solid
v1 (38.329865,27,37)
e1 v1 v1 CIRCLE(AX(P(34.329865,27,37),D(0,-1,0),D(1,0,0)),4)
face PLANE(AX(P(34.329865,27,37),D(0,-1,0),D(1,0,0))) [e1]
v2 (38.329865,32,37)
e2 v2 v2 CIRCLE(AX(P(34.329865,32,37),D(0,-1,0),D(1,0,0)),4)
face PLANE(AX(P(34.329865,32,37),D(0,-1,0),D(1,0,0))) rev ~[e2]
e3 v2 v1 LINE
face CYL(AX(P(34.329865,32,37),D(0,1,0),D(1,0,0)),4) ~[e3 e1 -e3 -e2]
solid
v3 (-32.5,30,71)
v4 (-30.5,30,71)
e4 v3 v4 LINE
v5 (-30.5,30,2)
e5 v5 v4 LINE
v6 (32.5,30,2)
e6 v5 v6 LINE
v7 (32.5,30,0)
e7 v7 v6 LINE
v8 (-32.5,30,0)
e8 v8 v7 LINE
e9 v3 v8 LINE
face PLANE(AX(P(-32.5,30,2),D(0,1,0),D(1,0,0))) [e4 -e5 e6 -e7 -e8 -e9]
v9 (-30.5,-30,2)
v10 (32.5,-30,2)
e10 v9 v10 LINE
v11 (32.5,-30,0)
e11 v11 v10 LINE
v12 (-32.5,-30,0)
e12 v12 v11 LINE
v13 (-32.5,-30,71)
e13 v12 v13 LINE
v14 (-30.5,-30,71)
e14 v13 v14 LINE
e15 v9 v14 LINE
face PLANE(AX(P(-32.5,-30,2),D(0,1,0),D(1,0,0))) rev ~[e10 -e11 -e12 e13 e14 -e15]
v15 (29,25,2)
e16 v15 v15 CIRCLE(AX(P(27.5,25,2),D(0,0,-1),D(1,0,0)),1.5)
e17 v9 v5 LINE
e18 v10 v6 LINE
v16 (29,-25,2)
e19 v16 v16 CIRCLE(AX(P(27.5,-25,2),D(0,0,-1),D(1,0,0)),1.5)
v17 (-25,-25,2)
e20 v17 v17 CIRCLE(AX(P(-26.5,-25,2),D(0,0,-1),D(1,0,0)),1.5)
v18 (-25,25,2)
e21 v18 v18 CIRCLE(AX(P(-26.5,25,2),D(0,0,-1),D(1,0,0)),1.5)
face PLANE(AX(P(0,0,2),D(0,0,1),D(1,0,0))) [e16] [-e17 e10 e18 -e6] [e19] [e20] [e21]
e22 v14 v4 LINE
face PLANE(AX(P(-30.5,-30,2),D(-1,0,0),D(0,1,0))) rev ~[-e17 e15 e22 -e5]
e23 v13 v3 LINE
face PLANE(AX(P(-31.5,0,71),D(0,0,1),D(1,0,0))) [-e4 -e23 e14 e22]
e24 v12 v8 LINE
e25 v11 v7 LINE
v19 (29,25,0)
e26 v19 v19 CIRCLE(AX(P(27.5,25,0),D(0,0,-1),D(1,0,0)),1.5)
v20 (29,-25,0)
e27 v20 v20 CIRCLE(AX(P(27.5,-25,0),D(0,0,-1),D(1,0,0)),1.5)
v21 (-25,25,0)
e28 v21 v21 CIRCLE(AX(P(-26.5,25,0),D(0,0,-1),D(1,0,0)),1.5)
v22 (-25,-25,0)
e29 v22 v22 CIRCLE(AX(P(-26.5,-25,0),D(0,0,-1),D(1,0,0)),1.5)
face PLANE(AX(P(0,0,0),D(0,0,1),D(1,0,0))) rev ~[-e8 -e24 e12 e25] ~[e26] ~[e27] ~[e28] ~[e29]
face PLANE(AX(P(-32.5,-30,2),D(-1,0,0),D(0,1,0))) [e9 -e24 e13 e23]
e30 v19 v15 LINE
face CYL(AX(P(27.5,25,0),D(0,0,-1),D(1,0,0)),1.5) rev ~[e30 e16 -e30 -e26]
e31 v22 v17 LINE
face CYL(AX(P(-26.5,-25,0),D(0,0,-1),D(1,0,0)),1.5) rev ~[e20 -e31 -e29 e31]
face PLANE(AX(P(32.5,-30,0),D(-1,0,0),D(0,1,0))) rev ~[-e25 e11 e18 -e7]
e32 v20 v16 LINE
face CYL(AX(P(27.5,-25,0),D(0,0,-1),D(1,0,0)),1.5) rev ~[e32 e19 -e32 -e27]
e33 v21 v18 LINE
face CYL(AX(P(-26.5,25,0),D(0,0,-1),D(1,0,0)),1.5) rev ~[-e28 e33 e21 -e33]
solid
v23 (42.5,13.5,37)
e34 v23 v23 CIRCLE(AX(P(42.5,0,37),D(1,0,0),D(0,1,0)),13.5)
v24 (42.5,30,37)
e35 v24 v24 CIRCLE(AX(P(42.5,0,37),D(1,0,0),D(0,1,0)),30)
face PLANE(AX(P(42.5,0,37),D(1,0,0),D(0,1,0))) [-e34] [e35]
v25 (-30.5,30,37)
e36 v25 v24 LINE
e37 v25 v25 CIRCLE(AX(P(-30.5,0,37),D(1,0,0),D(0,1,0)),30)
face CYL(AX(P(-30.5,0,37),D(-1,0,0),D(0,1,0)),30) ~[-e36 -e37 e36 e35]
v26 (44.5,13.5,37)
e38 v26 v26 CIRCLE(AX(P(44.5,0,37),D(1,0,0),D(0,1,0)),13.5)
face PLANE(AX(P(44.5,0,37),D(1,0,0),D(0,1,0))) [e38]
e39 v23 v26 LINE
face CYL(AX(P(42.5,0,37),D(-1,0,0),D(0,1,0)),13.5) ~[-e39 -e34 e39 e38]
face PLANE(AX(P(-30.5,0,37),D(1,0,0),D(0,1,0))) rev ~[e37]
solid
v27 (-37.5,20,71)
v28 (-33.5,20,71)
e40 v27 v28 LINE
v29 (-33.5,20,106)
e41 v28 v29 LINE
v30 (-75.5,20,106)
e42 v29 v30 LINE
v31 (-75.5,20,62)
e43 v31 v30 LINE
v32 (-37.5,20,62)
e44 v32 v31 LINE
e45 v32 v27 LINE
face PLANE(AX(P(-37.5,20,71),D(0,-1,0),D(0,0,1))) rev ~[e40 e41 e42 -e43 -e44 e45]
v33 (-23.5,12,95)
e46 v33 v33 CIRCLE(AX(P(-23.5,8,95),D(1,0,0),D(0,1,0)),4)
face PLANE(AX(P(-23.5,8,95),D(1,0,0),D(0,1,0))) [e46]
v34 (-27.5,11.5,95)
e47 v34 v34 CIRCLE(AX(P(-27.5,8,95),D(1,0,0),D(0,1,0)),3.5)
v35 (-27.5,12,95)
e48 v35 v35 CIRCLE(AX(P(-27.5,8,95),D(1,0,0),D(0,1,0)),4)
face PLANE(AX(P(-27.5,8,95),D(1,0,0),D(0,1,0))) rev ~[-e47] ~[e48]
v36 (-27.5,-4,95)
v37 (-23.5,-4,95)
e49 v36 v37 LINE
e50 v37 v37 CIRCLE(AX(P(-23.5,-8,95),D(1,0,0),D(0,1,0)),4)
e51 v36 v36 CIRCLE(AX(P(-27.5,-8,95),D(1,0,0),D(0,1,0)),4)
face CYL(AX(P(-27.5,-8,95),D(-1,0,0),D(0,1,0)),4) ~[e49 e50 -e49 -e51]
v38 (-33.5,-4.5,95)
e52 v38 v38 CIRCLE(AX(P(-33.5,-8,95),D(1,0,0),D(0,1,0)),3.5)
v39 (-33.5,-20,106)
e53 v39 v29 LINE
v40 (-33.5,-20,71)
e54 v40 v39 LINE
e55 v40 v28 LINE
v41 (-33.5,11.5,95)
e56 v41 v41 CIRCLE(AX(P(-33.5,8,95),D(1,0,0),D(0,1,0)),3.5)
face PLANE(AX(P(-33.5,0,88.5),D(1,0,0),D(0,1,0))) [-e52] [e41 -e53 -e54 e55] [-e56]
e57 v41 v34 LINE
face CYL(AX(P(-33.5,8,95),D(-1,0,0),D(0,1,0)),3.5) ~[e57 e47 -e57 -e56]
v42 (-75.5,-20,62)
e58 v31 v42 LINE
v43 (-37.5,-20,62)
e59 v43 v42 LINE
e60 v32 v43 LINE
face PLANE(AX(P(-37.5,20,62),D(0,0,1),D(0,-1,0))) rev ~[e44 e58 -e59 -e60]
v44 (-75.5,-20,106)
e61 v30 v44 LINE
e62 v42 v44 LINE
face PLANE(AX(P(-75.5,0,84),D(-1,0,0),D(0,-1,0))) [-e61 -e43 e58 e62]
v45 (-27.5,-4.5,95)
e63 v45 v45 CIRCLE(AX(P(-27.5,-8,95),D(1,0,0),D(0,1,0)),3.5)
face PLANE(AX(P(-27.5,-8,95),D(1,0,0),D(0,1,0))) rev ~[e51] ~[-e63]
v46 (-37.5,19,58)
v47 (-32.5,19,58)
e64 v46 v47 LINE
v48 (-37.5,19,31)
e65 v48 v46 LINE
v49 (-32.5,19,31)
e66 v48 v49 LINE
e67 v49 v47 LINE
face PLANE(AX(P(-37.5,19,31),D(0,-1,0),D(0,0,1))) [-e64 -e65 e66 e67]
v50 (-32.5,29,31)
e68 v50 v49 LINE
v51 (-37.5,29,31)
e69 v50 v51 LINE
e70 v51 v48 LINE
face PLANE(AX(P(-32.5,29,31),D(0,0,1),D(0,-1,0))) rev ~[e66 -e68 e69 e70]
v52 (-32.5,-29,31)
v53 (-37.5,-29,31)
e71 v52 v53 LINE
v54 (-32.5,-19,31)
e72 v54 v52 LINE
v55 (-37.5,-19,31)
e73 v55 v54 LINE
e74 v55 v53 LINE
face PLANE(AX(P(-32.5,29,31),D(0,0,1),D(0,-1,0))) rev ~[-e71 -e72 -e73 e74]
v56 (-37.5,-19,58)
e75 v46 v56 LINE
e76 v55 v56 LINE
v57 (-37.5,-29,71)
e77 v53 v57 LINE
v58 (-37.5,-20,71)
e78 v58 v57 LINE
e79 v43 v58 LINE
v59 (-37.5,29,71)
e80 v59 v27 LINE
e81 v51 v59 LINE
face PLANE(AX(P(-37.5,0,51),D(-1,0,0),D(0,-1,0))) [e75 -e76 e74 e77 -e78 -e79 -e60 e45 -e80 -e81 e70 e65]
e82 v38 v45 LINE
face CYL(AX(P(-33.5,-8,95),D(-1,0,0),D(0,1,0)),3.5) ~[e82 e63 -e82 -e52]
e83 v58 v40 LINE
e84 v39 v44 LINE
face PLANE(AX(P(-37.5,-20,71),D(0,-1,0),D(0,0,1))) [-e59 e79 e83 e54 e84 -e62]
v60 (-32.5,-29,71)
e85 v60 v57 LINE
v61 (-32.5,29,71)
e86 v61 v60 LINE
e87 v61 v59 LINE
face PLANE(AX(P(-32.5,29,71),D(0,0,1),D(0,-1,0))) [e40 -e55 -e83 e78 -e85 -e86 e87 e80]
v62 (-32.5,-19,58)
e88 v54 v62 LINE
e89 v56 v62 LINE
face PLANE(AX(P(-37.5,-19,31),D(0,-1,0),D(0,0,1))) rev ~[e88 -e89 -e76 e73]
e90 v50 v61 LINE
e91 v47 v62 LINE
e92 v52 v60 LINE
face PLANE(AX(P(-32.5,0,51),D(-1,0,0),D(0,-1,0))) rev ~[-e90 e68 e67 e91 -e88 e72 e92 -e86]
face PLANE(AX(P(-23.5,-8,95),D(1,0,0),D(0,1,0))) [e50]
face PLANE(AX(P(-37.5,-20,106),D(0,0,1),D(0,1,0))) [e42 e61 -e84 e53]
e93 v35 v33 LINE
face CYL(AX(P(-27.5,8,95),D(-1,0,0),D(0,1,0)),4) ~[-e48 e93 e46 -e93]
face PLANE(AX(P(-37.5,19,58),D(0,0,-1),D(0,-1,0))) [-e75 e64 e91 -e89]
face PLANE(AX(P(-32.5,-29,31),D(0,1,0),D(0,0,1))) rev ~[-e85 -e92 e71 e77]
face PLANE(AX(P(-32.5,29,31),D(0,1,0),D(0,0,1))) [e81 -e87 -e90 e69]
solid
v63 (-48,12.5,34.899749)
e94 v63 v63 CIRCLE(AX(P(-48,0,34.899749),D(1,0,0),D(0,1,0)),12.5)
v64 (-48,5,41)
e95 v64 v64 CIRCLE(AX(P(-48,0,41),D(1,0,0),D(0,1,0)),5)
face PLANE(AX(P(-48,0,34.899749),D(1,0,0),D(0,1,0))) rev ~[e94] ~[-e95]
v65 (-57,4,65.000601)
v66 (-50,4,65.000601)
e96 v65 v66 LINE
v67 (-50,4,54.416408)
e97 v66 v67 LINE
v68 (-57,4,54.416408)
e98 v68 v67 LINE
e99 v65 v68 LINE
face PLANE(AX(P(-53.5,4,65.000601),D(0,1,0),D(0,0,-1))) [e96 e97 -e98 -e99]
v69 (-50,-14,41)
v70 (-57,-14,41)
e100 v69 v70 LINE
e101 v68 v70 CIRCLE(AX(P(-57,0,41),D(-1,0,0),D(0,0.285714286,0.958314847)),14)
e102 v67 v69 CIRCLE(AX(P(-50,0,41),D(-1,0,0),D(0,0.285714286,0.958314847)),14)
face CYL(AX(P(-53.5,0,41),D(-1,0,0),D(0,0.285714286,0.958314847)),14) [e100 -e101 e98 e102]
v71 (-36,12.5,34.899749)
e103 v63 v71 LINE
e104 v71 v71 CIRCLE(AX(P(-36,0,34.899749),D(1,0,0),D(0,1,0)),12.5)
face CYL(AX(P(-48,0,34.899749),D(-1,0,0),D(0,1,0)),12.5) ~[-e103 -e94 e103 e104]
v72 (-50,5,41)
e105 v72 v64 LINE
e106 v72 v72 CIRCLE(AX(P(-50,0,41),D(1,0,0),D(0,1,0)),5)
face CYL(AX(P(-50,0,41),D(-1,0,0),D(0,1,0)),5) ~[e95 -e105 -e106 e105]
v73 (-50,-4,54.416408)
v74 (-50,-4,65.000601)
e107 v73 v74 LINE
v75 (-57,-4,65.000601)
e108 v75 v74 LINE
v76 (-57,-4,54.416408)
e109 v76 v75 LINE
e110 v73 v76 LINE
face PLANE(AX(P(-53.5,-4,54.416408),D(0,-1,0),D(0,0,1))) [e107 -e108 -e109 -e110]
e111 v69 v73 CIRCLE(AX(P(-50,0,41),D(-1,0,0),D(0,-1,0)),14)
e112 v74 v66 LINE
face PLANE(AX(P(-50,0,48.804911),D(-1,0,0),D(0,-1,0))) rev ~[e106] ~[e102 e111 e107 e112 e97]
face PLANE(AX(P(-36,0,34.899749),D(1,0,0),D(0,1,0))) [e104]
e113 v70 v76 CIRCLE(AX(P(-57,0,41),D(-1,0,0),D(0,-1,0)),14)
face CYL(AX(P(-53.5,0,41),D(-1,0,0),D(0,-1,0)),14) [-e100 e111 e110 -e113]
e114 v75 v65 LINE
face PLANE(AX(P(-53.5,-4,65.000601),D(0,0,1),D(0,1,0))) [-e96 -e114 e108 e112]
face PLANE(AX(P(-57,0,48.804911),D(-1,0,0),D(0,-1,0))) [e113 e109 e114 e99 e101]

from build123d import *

# Parameters (mm, degrees)
F0_W      = 65
F0_H      = 60
F1_DEPTH  = 2
F2_W      = 2
F2_H      = 60
F3_DEPTH  = 69
F5_DEPTH  = 73
F6_R      = 13.5
F7_DEPTH  = 2
F8_W      = 58
F8_H      = 40
F9_DEPTH  = 5
F10_W     = 38
F10_H     = 27
F11_DEPTH = 5
F12_W     = 40
F12_H     = 44
F13_DEPTH = 38
F14_W     = 40
F14_H     = 35
F15_DEPTH = 4
F16_R     = 3.5
F17_DEPTH = 6
F18_R     = 4
F19_DEPTH = 4
F22_DEPTH = 3.5
F23_R     = 5
F24_DEPTH = 2
F25_R     = 12.5
F26_DEPTH = 12
F28_R     = 4
F29_DEPTH = 5
F30_R     = 1.5
F31_DEPTH = 25


with BuildPart() as f1:
    # F0 (on Top) → F1 (new body)
    with BuildSketch(Plane.XY):
        Rectangle(F0_W, F0_H)
    extrude(amount=F1_DEPTH)

    # F2 (on face) → F3 (join)
    with BuildSketch(Plane.XY.offset(2)):
        with Locations((-31.5, 0)):
            Rectangle(F2_W, F2_H)
    extrude(amount=F3_DEPTH)

    # F30 (on face) → F31 (cut)
    with BuildSketch(Plane(origin=(0, 0, 0), x_dir=(1, 0, 0), z_dir=(0, 0, -1))):
        with Locations((27.5, 25)):
            Circle(F30_R)
        with Locations((27.5, -25)):
            Circle(F30_R)
        with Locations((-26.5, 25)):
            Circle(F30_R)
        with Locations((-26.5, -25)):
            Circle(F30_R)
    extrude(amount=-F31_DEPTH, mode=Mode.SUBTRACT)


with BuildPart() as f5:
    # F4 (on face) → F5 (new body)
    with BuildSketch(Plane.YZ.offset(-30.5)):
        with BuildLine():
            ThreePointArc((-30, 37), (0, 7), (30, 37))
            ThreePointArc((30, 37), (0, 67), (-30, 37))
        make_face()
    extrude(amount=F5_DEPTH)

    # F6 (on face) → F7 (join)
    with BuildSketch(Plane.YZ.offset(42.5)):
        with Locations((0, 37)):
            Circle(F6_R)
    extrude(amount=F7_DEPTH)


with BuildPart() as f9:
    # F8 (on face) → F9 (new body)
    with BuildSketch(Plane(origin=(-32.5, 0, 0), x_dir=(0, -1, 0), z_dir=(-1, 0, 0))):
        with Locations((0, 51)):
            Rectangle(F8_W, F8_H)
    extrude(amount=F9_DEPTH)

    # F10 (on face) → F11 (cut, through all)
    with BuildSketch(Plane(origin=(-37.5, 0, 0), x_dir=(0, -1, 0), z_dir=(-1, 0, 0))):
        with Locations((0, 44.5)):
            Rectangle(F10_W, F10_H)
    extrude(amount=-F11_DEPTH, mode=Mode.SUBTRACT)

    # F12 (on face) → F13 (join)
    with BuildSketch(Plane(origin=(-37.5, 0, 0), x_dir=(0, -1, 0), z_dir=(-1, 0, 0))):
        with Locations((0, 84)):
            Rectangle(F12_W, F12_H)
    extrude(amount=F13_DEPTH)

    # F14 (on face) → F15 (join)
    with BuildSketch(Plane.YZ.offset(-37.5)):
        with Locations((0, 88.5)):
            Rectangle(F14_W, F14_H)
    extrude(amount=F15_DEPTH)

    # F16 (on face) → F17 (join)
    with BuildSketch(Plane.YZ.offset(-33.5)):
        with Locations((8, 95)):
            Circle(F16_R)
        with Locations((-8, 95)):
            Circle(F16_R)
    extrude(amount=F17_DEPTH)

    # F18 (on face) → F19 (join)
    with BuildSketch(Plane.YZ.offset(-27.5)):
        with Locations((8, 95)):
            Circle(F18_R)
        with Locations((-8, 95)):
            Circle(F18_R)
    extrude(amount=F19_DEPTH)


with BuildPart() as f22:
    # F21 (on offset) → F22 (new body, symmetric)
    with BuildSketch(Plane(origin=(-53.5, 0, 0), x_dir=(0, -1, 0), z_dir=(-1, 0, 0))):
        with BuildLine():
            Line((4, 43.0200397968), (4, 54.416407865))
            ThreePointArc((4, 54.416407865), (0, 55), (-4, 54.416407865))
            Line((-4, 54.416407865), (-4, 43.0200397968))
            Line((-4, 43.0200397968), (4, 43.0200397968))
        make_face()
        with BuildLine():
            ThreePointArc((-4, 54.416407865), (-8.3666002653, 29.7750278397), (14, 41))
            ThreePointArc((14, 41), (11.2249721603, 49.3666002653), (4, 54.416407865))
            Line((4, 54.416407865), (4, 43.0200397968))
            Line((4, 43.0200397968), (-4, 43.0200397968))
            Line((-4, 43.0200397968), (-4, 54.416407865))
        make_face()
        with BuildLine():
            ThreePointArc((-4, 54.416407865), (0, 55), (4, 54.416407865))
            Line((4, 54.416407865), (4, 65.0006011128))
            Line((4, 65.0006011128), (-4, 65.0006011128))
            Line((-4, 65.0006011128), (-4, 54.416407865))
        make_face()
    extrude(amount=F22_DEPTH, both=True)

    # F23 (on face) → F24 (join)
    with BuildSketch(Plane.YZ.offset(-50)):
        with Locations((0, 41)):
            Circle(F23_R)
    extrude(amount=F24_DEPTH)

    # F25 (on face) → F26 (join)
    with BuildSketch(Plane.YZ.offset(-48)):
        with Locations((0, 34.8997488618)):
            Circle(F25_R)
    extrude(amount=F26_DEPTH)


with BuildPart() as f29:
    # F28 (on offset) → F29 (new body)
    with BuildSketch(Plane.XZ.offset(-32)):
        with Locations((34.3298651278, 37)):
            Circle(F28_R)
    extrude(amount=F29_DEPTH)


solid = Compound([f1.part, f5.part, f9.part, f22.part, f29.part])
